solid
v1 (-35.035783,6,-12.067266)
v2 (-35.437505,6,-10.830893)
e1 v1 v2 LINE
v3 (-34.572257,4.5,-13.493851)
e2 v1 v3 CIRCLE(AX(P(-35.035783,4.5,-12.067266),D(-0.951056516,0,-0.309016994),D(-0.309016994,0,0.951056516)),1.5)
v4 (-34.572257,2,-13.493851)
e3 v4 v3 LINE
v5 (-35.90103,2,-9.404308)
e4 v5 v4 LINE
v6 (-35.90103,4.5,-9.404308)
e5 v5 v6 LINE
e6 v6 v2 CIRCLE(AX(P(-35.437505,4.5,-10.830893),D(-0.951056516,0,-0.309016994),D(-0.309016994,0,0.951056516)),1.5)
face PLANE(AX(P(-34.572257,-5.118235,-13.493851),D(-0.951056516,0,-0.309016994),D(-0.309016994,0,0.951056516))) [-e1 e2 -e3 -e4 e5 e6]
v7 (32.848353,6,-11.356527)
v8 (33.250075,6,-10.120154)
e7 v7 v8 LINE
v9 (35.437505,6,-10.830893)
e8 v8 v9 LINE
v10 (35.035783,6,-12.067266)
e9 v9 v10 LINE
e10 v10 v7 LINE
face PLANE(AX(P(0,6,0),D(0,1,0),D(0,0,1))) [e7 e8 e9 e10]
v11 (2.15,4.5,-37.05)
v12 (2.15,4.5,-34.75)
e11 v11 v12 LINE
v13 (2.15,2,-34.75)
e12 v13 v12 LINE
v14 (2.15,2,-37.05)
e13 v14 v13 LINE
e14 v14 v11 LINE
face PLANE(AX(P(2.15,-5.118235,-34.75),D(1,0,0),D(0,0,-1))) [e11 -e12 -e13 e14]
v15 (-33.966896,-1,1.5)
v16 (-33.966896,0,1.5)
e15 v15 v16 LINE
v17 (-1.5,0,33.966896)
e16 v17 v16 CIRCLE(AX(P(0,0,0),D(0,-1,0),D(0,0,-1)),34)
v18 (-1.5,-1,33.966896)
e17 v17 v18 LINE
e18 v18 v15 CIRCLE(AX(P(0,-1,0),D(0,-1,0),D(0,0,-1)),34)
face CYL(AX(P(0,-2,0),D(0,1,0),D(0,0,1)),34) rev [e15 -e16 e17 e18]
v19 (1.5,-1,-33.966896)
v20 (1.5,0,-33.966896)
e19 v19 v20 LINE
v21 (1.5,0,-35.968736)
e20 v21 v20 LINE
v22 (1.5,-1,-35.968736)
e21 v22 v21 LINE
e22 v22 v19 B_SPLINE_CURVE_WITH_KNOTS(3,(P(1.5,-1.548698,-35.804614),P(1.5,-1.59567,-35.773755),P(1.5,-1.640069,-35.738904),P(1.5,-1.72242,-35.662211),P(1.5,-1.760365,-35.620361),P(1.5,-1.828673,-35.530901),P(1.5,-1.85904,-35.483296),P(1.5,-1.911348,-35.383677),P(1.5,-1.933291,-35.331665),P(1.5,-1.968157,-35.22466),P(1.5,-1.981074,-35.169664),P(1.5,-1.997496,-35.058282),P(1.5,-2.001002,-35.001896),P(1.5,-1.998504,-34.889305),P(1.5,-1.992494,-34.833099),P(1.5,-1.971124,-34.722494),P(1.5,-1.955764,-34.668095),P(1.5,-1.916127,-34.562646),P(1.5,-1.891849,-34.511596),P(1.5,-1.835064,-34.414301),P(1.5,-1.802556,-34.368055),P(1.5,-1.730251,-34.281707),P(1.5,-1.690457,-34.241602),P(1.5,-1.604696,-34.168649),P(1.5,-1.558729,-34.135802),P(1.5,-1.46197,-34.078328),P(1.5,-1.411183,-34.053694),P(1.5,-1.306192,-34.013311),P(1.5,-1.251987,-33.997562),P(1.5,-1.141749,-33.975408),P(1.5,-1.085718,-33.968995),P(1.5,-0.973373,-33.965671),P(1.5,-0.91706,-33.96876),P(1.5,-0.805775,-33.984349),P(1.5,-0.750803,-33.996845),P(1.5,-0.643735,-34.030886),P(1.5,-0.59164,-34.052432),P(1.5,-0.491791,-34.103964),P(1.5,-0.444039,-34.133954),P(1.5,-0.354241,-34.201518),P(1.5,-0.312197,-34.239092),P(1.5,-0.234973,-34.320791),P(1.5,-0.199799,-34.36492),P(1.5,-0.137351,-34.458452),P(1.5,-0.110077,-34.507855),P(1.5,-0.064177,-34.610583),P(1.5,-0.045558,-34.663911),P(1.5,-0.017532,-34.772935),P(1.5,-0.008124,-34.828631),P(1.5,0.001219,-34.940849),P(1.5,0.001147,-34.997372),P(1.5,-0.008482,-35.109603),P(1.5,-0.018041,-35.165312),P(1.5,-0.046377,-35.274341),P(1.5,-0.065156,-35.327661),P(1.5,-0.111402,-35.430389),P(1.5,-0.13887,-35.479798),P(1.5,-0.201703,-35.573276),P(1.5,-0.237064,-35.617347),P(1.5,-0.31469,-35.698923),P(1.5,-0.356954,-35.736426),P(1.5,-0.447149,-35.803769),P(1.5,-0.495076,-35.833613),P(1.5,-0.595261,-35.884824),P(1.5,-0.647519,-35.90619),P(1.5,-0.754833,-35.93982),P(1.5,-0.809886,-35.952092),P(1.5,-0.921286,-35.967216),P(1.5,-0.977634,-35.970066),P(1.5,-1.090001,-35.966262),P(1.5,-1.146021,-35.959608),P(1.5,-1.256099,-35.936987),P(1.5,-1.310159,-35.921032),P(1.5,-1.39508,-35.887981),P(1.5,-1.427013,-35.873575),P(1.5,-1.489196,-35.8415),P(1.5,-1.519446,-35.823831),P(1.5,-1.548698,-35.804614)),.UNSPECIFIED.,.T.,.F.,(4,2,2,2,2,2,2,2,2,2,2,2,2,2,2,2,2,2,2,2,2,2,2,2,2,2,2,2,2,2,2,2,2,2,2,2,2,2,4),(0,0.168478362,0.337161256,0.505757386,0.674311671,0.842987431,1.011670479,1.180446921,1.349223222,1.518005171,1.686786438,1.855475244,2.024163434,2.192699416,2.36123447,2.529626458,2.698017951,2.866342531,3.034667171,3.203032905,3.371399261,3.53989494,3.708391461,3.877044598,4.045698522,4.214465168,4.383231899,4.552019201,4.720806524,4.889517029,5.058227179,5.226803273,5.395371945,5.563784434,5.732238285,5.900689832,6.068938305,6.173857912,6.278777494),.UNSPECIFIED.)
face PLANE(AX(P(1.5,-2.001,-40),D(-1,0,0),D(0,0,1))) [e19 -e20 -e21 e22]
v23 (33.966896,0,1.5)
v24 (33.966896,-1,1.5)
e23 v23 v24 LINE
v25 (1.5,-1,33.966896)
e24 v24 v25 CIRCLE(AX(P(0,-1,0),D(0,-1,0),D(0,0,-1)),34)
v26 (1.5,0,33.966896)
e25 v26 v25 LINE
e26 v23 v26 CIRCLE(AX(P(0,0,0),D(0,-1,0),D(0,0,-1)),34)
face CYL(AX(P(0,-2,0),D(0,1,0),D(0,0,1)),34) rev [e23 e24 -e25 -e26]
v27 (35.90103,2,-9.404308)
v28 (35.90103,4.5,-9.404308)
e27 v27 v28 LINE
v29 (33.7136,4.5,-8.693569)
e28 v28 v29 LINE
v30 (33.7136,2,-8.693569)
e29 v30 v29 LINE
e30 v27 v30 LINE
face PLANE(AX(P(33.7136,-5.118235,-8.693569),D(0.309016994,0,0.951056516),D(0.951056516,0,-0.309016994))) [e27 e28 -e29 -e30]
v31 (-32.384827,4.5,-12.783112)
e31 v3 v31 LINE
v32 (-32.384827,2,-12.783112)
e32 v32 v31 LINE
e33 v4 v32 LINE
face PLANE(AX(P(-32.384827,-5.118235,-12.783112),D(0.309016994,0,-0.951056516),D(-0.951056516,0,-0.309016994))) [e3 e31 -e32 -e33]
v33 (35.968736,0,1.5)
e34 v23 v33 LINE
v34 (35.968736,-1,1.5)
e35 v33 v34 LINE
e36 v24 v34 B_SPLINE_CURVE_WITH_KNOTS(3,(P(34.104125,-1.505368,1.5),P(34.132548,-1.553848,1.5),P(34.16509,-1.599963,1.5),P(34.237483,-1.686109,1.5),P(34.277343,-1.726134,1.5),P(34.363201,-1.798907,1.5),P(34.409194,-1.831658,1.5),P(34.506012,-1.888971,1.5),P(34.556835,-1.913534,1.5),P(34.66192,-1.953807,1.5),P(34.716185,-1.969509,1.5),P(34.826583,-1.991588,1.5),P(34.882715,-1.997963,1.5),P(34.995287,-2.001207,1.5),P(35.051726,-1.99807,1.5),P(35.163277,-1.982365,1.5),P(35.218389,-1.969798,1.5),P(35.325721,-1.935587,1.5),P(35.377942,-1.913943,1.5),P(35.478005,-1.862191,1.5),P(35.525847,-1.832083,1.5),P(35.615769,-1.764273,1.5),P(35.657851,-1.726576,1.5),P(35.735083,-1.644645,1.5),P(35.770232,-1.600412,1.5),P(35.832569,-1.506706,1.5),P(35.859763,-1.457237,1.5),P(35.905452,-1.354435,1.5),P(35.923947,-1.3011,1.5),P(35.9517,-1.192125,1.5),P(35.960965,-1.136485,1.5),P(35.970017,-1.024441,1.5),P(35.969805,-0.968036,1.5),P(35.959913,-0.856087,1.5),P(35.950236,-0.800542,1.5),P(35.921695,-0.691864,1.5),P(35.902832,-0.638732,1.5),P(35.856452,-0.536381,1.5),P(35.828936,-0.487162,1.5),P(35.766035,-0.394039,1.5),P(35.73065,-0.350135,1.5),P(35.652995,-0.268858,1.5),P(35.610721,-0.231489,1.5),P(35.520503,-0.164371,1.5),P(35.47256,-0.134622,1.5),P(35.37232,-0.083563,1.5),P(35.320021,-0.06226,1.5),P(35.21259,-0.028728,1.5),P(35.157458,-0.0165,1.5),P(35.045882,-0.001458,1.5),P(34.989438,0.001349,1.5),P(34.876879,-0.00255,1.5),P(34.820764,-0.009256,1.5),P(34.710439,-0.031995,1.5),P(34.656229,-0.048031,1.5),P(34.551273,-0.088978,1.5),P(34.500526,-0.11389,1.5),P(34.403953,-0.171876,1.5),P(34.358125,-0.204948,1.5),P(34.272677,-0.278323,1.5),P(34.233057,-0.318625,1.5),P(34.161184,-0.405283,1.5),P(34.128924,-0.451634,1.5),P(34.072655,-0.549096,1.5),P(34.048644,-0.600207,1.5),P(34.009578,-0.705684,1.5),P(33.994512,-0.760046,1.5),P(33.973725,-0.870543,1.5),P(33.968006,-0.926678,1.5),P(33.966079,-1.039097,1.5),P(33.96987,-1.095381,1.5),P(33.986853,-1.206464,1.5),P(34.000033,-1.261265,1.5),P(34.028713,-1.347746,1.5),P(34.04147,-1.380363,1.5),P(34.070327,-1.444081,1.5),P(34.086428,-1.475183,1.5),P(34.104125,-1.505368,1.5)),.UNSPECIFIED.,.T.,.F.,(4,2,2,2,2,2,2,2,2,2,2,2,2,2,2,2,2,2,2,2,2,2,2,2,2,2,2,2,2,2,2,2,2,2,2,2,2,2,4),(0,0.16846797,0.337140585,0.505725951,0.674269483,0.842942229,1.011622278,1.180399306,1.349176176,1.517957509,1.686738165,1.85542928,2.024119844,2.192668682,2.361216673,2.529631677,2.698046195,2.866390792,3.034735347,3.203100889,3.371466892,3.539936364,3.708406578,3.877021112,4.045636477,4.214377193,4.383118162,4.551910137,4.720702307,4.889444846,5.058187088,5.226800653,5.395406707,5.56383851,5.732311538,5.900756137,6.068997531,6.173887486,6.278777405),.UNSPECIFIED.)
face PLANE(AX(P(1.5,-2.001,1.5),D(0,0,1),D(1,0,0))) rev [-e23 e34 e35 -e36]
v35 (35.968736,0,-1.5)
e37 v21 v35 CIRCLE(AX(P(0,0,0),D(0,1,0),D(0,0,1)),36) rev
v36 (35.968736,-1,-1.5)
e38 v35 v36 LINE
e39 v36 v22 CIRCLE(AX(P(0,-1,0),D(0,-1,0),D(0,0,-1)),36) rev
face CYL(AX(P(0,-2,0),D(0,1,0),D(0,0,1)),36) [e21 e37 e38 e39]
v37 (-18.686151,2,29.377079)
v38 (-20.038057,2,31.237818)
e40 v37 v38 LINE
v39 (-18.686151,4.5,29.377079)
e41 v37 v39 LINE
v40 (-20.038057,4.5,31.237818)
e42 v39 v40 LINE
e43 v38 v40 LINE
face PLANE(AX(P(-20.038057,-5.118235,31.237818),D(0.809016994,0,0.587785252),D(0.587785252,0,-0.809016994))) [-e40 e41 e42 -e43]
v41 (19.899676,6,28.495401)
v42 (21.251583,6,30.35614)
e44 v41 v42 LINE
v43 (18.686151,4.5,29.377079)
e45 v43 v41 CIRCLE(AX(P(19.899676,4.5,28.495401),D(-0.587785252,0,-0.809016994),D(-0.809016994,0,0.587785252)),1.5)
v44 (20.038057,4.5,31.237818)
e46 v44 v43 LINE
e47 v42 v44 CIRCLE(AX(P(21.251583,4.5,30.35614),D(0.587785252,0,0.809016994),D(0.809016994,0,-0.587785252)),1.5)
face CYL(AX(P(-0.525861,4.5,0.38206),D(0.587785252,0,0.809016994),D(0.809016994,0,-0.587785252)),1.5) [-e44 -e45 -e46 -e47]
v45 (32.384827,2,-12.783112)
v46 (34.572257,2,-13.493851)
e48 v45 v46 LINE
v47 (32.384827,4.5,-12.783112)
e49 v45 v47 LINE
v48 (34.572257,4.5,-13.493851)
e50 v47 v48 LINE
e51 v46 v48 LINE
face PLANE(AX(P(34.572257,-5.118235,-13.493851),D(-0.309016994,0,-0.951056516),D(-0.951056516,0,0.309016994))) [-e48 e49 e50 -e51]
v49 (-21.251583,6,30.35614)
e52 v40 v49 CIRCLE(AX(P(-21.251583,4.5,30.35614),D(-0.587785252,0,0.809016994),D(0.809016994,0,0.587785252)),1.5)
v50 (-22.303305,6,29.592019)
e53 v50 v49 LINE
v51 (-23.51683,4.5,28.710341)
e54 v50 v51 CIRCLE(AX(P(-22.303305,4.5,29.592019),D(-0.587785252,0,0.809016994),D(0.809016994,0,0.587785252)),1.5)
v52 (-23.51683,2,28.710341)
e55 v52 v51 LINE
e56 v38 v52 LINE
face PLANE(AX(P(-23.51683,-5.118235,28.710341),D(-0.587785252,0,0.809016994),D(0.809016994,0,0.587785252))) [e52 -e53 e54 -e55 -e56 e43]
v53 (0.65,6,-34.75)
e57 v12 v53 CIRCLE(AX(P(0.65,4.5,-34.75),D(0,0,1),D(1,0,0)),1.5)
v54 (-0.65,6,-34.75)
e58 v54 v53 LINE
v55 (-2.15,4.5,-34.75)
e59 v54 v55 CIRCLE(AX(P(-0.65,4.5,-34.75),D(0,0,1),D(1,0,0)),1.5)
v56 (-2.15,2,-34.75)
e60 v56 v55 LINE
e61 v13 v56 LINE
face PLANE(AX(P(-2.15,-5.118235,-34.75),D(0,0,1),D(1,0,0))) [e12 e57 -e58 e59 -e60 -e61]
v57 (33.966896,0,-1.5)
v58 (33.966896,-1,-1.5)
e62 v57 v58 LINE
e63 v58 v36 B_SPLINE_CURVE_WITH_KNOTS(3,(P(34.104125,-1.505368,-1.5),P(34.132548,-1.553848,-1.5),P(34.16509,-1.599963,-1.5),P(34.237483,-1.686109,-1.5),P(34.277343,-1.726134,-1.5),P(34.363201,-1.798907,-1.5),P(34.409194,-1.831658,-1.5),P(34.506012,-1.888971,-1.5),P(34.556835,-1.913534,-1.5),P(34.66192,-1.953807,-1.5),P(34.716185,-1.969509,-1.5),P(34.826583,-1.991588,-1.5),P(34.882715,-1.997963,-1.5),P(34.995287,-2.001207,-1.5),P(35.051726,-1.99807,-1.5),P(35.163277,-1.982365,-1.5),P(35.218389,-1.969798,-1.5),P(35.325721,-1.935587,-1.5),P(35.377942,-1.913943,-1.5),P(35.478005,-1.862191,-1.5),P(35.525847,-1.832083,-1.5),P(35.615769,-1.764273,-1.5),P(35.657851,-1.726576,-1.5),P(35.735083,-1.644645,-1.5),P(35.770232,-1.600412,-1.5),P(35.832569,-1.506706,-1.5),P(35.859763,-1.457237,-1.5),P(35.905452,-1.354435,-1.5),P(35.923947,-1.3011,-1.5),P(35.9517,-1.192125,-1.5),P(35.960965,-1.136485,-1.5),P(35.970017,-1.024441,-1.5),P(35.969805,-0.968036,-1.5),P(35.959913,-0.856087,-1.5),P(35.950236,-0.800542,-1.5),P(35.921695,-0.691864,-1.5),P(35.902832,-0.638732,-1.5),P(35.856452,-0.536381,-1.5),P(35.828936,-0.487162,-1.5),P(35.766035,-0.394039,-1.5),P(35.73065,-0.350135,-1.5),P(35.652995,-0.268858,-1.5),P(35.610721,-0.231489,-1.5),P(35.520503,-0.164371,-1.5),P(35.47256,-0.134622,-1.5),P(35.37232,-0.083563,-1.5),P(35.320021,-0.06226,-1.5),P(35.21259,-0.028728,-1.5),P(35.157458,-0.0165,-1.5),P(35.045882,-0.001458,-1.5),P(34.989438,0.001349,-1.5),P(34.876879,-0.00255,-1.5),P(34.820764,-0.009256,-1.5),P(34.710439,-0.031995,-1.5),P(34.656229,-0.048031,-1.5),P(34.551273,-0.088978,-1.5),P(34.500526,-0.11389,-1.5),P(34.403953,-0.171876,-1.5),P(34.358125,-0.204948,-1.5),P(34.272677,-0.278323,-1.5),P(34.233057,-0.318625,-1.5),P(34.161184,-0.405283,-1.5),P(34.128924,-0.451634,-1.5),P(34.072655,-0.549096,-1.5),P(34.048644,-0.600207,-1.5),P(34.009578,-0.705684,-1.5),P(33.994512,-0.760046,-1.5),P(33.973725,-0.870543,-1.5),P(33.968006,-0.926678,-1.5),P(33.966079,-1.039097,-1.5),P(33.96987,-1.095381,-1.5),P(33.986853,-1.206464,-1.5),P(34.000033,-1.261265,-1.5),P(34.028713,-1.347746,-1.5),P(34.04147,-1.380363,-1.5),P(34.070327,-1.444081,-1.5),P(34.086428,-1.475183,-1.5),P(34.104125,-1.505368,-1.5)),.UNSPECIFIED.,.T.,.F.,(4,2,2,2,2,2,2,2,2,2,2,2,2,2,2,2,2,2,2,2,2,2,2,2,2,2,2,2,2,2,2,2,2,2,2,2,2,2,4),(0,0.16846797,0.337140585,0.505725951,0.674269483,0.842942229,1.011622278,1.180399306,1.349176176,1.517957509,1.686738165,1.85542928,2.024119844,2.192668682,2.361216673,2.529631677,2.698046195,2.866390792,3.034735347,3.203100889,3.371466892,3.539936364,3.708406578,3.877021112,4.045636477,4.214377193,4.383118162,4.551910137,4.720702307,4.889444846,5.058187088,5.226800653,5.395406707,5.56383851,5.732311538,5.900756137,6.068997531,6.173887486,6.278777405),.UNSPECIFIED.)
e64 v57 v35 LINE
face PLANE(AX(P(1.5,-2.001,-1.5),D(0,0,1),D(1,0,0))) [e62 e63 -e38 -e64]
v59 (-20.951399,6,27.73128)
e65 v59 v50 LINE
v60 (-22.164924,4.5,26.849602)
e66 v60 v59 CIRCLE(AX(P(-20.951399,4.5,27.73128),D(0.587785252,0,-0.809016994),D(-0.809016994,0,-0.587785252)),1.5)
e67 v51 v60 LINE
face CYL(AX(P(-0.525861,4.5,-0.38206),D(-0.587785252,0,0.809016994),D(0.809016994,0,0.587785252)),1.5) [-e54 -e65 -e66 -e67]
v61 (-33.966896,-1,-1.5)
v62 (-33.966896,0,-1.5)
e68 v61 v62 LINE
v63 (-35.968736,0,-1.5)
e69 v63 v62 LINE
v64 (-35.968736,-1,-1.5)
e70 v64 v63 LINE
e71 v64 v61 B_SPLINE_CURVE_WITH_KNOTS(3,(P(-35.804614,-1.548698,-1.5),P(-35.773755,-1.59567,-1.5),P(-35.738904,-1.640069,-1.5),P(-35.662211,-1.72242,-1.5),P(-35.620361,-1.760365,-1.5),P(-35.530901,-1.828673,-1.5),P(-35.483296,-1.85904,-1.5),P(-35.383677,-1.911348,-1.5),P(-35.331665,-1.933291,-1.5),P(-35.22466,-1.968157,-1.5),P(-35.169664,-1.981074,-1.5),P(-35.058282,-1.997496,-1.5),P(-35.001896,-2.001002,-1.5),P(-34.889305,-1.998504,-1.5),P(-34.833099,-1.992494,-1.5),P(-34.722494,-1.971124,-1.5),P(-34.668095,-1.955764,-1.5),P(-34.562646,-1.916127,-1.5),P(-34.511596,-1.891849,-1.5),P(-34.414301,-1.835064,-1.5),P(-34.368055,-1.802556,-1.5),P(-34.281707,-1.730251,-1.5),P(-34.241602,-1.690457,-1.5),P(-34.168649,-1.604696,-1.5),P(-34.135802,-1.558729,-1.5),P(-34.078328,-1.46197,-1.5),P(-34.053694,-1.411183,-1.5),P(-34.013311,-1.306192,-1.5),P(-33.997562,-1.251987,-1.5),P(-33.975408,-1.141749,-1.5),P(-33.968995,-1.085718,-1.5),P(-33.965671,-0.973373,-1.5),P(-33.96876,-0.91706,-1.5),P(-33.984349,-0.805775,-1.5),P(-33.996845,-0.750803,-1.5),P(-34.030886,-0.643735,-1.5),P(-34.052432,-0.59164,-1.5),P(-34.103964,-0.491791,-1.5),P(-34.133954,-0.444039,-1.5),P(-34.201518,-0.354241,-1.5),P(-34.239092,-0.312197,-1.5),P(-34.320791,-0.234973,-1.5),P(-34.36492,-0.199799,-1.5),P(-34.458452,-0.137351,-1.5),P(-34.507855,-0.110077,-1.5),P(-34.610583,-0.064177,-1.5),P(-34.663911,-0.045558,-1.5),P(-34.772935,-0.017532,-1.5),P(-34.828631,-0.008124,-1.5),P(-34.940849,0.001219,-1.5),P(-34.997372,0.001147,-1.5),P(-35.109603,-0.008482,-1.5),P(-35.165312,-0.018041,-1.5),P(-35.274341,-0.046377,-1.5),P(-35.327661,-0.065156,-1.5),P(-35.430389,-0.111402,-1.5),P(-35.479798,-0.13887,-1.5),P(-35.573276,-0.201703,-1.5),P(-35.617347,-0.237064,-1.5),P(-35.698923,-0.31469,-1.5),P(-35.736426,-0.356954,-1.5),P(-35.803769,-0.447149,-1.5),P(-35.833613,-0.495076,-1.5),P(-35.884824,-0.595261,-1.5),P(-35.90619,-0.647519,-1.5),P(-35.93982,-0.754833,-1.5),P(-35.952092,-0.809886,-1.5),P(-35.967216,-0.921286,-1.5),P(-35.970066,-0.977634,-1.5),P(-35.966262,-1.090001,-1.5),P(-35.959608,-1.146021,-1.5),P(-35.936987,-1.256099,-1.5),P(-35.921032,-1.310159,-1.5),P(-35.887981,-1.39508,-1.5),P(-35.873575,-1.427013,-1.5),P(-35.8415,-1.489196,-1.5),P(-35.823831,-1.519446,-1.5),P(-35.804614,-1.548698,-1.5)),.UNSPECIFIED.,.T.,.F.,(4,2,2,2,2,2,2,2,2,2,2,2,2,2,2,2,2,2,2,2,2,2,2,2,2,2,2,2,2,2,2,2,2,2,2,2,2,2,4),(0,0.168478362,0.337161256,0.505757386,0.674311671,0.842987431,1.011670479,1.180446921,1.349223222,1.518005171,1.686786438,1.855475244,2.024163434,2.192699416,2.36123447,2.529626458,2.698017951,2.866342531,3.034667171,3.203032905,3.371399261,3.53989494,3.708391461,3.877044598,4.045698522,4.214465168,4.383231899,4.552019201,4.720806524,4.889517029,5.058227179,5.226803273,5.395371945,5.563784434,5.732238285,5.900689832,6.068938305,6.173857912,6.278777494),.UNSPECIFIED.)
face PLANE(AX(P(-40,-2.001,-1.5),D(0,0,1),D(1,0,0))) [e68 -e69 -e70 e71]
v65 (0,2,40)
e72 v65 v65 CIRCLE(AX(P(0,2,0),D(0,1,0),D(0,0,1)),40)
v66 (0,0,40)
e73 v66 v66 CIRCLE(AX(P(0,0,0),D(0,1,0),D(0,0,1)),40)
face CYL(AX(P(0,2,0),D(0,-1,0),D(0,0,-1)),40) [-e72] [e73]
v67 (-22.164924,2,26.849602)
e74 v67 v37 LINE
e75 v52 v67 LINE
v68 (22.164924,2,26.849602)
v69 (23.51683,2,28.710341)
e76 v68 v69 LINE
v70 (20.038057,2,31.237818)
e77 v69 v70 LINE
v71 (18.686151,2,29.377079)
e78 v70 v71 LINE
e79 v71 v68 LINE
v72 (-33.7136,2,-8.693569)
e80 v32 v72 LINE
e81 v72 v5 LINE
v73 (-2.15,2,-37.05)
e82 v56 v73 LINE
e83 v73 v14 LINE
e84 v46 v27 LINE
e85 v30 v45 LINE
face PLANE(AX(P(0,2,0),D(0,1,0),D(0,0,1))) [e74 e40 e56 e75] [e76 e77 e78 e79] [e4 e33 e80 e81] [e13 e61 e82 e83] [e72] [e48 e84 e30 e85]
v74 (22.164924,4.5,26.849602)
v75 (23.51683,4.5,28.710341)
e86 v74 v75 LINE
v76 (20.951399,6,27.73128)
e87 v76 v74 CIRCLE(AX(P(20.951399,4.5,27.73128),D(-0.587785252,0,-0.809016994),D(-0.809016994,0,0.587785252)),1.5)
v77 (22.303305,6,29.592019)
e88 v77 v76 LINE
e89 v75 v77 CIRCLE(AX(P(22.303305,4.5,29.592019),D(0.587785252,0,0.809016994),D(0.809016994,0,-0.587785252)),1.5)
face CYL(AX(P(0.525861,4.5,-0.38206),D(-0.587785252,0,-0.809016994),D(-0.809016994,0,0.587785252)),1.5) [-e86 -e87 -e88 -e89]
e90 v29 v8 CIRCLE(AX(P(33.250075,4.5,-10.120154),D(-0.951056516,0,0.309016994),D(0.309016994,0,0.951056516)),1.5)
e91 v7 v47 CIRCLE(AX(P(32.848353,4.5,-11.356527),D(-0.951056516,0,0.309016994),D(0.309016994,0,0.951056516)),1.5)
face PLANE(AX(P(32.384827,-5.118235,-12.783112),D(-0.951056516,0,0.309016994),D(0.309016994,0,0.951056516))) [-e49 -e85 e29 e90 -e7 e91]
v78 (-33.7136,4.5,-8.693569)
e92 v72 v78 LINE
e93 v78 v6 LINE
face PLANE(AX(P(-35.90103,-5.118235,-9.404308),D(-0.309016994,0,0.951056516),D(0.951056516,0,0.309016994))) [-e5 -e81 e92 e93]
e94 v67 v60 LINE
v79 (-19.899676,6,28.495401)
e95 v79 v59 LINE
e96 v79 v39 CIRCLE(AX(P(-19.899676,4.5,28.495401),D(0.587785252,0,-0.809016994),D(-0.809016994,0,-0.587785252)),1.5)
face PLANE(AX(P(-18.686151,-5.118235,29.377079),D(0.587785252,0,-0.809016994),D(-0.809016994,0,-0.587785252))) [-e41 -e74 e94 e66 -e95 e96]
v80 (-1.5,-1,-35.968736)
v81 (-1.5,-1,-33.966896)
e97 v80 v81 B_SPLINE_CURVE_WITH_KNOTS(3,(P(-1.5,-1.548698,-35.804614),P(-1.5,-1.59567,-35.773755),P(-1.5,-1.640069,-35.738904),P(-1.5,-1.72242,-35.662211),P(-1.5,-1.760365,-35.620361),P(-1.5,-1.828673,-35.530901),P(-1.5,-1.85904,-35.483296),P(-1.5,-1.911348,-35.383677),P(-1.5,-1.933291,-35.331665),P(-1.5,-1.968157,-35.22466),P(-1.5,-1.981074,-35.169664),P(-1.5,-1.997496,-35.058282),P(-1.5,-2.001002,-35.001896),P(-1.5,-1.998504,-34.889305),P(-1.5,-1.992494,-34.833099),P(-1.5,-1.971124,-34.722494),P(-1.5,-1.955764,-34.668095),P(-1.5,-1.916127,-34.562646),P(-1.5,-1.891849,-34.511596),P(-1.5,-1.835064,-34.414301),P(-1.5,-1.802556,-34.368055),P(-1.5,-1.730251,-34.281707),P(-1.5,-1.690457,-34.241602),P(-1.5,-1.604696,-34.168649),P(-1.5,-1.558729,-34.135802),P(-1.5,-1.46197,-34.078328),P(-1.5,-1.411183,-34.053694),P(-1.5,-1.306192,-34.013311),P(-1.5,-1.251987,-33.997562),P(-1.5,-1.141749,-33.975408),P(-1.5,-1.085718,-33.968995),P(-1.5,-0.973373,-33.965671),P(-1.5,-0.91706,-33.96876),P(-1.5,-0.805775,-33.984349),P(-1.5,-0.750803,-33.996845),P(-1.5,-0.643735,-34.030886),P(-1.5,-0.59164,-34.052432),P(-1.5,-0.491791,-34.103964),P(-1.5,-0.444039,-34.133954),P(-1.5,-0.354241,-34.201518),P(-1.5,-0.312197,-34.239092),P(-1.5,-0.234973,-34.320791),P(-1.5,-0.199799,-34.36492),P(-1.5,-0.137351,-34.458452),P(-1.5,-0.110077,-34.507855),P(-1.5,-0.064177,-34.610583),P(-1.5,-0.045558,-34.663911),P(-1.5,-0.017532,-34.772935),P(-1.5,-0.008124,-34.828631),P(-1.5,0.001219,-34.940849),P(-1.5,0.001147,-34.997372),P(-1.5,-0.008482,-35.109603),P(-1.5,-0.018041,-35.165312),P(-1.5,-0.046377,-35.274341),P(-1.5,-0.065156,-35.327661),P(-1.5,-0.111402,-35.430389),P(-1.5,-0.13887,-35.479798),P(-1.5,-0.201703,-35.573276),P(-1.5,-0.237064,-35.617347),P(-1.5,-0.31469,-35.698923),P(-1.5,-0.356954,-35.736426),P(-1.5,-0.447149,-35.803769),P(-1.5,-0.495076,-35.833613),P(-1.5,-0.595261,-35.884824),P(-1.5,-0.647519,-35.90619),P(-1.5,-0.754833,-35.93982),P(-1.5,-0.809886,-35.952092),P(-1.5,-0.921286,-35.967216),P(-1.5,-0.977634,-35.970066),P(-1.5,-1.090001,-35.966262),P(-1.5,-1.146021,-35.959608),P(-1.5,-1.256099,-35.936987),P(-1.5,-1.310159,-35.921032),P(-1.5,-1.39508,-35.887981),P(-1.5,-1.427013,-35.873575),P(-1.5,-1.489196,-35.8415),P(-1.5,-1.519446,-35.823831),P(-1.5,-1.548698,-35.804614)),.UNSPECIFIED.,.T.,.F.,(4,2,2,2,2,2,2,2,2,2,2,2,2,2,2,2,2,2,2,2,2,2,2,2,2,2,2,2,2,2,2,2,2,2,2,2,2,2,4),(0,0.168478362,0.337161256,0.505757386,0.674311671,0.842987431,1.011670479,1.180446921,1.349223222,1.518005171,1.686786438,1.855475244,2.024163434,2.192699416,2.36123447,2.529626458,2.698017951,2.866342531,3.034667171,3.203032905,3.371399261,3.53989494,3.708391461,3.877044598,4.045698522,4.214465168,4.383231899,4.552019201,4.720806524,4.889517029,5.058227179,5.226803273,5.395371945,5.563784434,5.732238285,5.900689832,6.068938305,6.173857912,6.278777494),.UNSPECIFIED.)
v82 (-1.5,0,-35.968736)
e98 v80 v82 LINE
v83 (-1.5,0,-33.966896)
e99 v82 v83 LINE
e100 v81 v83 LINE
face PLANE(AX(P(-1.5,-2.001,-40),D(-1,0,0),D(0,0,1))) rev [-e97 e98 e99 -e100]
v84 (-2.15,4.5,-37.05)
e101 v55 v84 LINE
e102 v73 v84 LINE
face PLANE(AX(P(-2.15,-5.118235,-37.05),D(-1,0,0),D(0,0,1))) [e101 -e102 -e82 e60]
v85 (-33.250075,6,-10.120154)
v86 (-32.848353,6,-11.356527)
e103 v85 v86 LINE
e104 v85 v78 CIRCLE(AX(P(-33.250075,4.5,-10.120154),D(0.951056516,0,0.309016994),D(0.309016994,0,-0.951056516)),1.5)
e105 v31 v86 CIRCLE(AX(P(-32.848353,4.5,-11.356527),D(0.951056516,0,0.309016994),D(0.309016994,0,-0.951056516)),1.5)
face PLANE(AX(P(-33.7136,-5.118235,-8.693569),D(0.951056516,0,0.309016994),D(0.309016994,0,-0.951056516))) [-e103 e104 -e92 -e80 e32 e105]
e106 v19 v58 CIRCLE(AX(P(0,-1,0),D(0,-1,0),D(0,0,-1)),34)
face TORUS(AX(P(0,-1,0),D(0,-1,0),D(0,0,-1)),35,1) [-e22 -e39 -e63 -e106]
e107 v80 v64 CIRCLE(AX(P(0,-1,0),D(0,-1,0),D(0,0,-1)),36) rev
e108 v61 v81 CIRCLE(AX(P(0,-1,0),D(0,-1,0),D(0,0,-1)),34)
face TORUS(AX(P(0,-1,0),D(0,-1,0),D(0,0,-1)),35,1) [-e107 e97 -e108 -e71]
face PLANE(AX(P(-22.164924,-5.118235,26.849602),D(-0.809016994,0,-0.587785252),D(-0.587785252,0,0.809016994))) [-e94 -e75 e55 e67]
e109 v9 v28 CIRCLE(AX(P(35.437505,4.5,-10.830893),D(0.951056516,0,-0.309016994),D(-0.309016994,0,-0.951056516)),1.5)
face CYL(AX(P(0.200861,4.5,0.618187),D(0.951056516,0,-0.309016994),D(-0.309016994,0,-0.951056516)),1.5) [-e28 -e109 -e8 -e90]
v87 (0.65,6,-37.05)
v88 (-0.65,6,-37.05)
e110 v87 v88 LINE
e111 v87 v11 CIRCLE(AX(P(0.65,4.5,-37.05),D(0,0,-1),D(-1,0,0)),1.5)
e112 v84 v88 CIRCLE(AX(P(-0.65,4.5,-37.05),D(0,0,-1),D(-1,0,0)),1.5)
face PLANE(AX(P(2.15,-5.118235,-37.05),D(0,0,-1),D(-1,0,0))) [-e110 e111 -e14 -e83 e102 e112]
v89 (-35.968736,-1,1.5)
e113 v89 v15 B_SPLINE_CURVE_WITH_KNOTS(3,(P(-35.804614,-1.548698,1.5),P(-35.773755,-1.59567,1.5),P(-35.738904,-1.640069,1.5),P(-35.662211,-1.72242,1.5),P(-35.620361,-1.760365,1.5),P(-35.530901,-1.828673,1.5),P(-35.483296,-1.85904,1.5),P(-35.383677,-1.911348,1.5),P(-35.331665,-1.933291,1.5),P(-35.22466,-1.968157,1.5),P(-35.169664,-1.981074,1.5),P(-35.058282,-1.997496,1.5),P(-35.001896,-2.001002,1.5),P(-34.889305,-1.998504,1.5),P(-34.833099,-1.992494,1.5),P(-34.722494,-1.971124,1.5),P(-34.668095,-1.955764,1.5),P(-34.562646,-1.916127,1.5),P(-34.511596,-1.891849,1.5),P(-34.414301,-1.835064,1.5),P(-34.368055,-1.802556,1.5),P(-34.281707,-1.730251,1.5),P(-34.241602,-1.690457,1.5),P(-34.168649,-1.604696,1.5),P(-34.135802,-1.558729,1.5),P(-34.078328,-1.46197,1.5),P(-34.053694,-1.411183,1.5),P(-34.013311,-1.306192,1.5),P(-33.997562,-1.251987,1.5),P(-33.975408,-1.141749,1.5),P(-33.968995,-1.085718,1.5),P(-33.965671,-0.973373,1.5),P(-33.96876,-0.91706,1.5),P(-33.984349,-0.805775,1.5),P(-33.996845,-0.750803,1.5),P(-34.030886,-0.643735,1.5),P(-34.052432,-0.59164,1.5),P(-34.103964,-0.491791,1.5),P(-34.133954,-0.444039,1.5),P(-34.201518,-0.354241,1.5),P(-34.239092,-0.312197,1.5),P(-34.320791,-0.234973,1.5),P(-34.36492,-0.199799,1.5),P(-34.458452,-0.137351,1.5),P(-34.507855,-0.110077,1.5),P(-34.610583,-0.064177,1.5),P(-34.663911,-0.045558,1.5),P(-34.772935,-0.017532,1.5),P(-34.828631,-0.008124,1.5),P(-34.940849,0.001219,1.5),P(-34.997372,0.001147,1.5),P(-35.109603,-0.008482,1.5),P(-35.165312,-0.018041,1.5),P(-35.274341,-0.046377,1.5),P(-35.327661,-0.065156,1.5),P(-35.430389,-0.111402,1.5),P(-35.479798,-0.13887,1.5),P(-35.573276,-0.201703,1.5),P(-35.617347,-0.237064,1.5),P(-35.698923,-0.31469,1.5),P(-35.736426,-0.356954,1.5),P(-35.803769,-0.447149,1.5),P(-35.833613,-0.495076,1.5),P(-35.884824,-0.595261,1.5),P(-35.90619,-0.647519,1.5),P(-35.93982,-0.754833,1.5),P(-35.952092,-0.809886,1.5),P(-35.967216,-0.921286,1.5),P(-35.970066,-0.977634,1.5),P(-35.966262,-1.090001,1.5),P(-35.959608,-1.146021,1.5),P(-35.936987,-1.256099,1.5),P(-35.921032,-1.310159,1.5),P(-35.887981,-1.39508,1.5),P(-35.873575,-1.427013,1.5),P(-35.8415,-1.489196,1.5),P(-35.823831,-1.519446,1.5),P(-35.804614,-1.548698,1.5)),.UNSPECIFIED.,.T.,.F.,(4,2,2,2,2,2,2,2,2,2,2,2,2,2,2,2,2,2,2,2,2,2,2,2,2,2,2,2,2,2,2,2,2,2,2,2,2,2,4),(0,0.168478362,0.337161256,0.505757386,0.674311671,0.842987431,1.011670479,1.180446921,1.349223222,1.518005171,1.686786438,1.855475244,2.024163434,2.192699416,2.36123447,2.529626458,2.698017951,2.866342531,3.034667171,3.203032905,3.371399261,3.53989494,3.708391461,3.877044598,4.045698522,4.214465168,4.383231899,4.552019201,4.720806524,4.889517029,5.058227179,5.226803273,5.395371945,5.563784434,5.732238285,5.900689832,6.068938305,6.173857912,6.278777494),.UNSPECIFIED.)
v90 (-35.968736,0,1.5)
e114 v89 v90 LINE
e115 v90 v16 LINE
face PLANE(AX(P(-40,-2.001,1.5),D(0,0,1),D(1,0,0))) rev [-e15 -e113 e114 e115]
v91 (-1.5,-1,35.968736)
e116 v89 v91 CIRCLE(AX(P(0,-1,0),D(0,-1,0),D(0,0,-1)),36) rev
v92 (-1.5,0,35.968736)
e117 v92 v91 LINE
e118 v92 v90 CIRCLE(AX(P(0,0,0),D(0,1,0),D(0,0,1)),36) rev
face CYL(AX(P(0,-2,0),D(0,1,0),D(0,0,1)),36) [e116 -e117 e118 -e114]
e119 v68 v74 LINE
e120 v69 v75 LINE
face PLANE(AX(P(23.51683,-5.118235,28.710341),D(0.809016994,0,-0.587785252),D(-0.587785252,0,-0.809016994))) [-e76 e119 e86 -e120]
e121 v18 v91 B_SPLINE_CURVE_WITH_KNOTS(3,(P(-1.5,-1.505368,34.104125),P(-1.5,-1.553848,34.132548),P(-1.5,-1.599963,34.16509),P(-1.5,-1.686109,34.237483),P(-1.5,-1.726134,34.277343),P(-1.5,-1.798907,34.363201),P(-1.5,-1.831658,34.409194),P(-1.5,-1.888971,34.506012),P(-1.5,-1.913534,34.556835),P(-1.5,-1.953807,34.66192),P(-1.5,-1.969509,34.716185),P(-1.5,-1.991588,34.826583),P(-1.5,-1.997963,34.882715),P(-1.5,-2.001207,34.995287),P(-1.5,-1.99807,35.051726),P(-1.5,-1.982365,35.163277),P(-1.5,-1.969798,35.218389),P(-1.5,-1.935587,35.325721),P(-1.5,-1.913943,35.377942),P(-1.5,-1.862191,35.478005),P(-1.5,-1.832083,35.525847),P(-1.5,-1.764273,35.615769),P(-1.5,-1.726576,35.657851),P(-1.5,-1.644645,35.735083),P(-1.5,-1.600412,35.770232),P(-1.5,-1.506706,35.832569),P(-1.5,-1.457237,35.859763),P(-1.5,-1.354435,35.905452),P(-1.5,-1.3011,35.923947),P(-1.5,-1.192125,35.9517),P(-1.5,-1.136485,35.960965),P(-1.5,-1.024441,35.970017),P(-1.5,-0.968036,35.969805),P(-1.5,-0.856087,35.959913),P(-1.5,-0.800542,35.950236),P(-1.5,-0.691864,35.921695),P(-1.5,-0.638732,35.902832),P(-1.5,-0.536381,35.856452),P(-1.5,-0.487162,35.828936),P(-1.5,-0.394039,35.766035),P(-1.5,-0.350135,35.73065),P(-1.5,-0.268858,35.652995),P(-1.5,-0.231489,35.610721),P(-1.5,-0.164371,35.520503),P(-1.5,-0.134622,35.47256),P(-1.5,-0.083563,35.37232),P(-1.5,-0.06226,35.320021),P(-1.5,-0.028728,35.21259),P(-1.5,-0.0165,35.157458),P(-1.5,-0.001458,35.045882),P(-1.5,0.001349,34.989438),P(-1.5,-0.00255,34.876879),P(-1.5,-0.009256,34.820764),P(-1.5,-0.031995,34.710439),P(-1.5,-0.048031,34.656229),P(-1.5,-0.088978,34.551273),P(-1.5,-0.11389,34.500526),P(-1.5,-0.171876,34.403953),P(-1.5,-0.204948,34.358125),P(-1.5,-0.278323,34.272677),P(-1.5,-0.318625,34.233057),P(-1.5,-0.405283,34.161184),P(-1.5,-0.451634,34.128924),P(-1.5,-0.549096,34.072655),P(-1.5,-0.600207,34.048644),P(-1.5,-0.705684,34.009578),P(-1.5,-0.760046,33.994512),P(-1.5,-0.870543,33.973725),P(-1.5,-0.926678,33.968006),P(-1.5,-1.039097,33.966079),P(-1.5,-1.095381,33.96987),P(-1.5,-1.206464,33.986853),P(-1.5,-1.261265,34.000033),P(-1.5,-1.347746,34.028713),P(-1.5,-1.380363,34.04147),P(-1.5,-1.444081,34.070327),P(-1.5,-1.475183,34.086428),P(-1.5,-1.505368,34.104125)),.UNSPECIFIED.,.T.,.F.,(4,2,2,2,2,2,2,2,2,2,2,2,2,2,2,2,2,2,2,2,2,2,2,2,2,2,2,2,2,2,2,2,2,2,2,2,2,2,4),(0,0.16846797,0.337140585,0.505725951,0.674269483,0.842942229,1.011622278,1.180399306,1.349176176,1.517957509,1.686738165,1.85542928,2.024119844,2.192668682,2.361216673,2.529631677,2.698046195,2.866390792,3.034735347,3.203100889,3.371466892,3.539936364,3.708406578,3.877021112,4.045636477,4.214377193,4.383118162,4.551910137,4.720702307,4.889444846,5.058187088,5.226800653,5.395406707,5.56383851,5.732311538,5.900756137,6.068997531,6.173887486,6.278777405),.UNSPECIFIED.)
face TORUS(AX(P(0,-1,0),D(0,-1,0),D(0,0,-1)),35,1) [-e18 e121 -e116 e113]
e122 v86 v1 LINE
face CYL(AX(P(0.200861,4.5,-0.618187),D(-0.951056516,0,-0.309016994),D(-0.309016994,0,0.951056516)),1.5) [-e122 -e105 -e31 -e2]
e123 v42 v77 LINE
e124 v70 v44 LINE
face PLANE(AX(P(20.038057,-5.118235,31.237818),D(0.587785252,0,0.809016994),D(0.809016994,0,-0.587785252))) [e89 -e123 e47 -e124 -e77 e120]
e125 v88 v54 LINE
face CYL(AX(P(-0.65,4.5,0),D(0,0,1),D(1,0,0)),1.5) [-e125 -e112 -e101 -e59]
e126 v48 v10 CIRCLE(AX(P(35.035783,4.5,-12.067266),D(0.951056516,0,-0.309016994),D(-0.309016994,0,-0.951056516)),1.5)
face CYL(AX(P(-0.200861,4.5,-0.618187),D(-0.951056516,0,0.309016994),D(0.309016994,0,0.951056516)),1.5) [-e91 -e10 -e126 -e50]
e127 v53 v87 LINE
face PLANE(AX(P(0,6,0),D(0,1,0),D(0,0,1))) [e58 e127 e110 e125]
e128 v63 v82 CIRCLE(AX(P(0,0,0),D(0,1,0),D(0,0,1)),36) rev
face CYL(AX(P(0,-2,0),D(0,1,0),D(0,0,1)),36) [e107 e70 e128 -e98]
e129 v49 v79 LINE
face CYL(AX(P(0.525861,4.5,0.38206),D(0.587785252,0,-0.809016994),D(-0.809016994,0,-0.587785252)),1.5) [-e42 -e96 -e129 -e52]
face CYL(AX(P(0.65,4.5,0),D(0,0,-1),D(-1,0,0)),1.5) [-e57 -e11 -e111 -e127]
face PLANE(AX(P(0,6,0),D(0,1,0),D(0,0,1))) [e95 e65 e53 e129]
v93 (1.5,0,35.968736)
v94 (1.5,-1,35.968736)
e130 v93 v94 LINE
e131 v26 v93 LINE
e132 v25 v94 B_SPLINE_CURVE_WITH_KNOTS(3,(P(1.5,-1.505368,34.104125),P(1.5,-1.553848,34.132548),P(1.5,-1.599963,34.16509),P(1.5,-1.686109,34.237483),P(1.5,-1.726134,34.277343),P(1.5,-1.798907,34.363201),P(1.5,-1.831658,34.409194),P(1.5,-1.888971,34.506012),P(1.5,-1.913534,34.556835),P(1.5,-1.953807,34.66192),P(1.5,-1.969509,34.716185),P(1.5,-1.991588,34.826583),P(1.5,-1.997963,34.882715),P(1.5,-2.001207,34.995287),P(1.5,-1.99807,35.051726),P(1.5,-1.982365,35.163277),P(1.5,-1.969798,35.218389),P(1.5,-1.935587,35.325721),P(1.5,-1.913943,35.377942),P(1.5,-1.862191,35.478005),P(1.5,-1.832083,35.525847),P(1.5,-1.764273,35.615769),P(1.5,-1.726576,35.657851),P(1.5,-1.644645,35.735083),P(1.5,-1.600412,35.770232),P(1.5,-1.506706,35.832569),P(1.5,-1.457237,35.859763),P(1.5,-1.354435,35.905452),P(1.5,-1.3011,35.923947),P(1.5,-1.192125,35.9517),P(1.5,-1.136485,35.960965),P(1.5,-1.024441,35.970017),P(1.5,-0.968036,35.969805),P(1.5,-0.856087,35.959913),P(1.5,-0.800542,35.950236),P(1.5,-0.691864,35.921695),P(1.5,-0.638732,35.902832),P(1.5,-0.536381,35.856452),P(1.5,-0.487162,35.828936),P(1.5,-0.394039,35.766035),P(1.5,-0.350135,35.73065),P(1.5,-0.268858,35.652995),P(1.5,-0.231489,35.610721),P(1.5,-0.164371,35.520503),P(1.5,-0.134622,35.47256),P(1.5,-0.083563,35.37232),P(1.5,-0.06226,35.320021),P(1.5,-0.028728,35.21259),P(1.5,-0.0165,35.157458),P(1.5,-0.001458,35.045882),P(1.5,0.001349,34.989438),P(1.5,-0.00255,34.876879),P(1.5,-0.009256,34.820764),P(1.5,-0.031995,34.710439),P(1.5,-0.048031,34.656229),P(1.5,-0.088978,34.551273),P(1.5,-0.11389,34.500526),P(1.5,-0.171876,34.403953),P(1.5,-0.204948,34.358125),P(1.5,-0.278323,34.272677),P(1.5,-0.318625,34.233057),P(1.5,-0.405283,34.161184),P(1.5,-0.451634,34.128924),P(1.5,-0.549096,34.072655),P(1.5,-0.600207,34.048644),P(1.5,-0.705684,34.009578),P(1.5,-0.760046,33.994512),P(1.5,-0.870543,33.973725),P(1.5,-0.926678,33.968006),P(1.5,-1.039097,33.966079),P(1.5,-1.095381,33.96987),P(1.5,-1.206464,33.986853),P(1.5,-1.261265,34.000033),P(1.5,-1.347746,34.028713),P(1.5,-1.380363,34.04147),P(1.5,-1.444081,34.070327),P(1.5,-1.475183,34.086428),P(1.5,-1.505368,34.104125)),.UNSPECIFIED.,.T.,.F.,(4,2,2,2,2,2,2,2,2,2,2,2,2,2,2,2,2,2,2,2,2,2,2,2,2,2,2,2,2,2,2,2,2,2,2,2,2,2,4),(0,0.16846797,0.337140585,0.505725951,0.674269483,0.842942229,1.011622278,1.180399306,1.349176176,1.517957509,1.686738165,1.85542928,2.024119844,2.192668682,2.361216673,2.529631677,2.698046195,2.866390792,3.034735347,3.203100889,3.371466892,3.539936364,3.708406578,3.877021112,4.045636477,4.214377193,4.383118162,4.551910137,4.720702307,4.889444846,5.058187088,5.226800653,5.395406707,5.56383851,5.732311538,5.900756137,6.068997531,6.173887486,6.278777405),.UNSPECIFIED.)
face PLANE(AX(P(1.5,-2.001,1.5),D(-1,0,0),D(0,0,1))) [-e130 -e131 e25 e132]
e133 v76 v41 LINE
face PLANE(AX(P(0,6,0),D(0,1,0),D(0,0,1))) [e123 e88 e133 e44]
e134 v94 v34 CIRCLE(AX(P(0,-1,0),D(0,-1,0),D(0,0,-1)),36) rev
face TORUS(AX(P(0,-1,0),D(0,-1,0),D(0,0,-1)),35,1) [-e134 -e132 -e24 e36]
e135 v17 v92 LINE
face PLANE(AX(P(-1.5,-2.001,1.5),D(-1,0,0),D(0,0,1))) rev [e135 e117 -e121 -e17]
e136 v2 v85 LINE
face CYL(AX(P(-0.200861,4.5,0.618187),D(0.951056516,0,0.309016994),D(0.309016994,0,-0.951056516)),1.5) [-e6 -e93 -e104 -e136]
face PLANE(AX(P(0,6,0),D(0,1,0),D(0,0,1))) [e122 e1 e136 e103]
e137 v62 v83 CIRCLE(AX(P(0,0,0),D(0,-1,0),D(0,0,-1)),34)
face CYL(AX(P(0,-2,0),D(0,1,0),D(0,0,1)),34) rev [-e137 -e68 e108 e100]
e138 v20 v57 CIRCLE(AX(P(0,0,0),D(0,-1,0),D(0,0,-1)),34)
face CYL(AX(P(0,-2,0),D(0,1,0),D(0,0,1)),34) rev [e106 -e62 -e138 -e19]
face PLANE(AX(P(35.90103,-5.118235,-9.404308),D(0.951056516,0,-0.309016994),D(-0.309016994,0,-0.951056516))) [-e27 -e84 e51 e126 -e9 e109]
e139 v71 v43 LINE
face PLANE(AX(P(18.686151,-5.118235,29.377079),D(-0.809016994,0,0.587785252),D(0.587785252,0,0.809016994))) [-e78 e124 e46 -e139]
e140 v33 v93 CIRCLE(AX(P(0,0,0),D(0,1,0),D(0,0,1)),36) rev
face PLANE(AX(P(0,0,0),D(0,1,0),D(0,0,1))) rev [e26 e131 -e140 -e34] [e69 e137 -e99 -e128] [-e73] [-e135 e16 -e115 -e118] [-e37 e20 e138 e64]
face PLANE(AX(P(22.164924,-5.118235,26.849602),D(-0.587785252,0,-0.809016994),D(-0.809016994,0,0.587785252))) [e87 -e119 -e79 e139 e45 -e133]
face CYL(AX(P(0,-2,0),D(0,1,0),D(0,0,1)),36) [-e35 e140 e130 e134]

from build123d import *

# Parameters (mm, degrees)
SKETCH1_R           = 40
BOSS_EXTRUDE1_DEPTH = 2
SKETCH2_W           = 4.6
SKETCH2_H           = 2.6
BOSS_EXTRUDE2_DEPTH = 4
SKETCH3_R           = 36
SKETCH3_R_2         = 34
BOSS_EXTRUDE3_DEPTH = 2
FILLET2_R           = 1
CUT_EXTRUDE1_DEPTH  = 2
SKETCH5_W           = 4.6
SKETCH5_H           = 2.6
SKETCH5_W_2         = 4.3
SKETCH5_H_2         = 2.3
CUT_EXTRUDE2_DEPTH  = 4
FILLET3_R           = 1.5


with BuildPart() as part:
    # Sketch1 → Boss-Extrude1 (new body)
    with BuildSketch(Plane(origin=(0, 0, 0), x_dir=(1, 0, 0), z_dir=(0, 1, 0))):
        with Locations(Location((0, 0, 0), (0, 0, 270))):
            Circle(SKETCH1_R)
    extrude(amount=BOSS_EXTRUDE1_DEPTH)

    # Sketch2 → Boss-Extrude2 (add)
    with BuildSketch(Plane(origin=(0, 2, 0), x_dir=(1, 0, 0), z_dir=(0, 1, 0))):
        with Locations((0, 35.9)):
            Rectangle(SKETCH2_W, SKETCH2_H)
        Polygon((34.668563319, 13.682862178), (36.090041493, 9.308002203), (33.617294551, 8.504558018), (32.195816377, 12.879417993), align=None)
        Polygon((23.726350472, -28.74352611), (20.004872298, -31.447338271), (18.476630642, -29.343894086), (22.198108816, -26.640081925), align=None)
        Polygon((-20.004872298, -31.447338271), (-23.726350472, -28.74352611), (-22.198108816, -26.640081925), (-18.476630642, -29.343894086), align=None)
        Polygon((-36.090041493, 9.308002203), (-34.668563319, 13.682862178), (-32.195816377, 12.879417993), (-33.617294551, 8.504558018), align=None)
    extrude(amount=BOSS_EXTRUDE2_DEPTH)

    # Sketch3 → Boss-Extrude3 (add)
    with BuildSketch(Plane.XZ):
        with Locations(Location((0, 0, 0), (0, 0, 90))):
            Circle(SKETCH3_R)
        with Locations(Location((0, 0, 0), (0, 0, 270))):
            Circle(SKETCH3_R_2, mode=Mode.SUBTRACT)
    extrude(amount=BOSS_EXTRUDE3_DEPTH)

    # Fillet2
    fillet2_edges = [part.edges().sort_by_distance(p)[0] for p in [
        (0, -2, -36),
        (0, -2, 34),
    ]]
    fillet(fillet2_edges, radius=FILLET2_R - 0.0001)  # a hair under: the kernel refuses the full size

    # Sketch4 → Cut-Extrude1 (cut)
    with BuildSketch(Plane.XZ):
        Polygon((-1.5, -40), (-1.5, -1.5), (-40, -1.5), (-40, 1.5), (-1.5, 1.5), (-1.5, 40), (1.5, 40), (1.5, 1.5), (40, 1.5), (40, -1.5), (1.5, -1.5), (1.5, -40), align=None)
    extrude(amount=CUT_EXTRUDE1_DEPTH, mode=Mode.SUBTRACT)

    # Sketch5 → Cut-Extrude2 (cut)
    # profile 1 of 5: a face of its own
    with BuildSketch(Plane(origin=(0, 6, 0), x_dir=(1, 0, 0), z_dir=(0, 1, 0))):
        Polygon((34.668563319, 13.682862178), (32.195816377, 12.879417993), (33.617294551, 8.504558018), (36.090041493, 9.308002203), align=None)
        Polygon((34.572257391, 13.493851152), (32.384827403, 12.783112065), (33.713600479, 8.693569044), (35.901030467, 9.404308132), align=None, mode=Mode.SUBTRACT)
    # profile 2 of 5: a face of its own
    with BuildSketch(Plane(origin=(0, 6, 0), x_dir=(1, 0, 0), z_dir=(0, 1, 0))):
        with Locations((0, 35.9)):
            Rectangle(SKETCH5_W, SKETCH5_H)
        with Locations((0, 35.9)):
            Rectangle(SKETCH5_W_2, SKETCH5_H_2, mode=Mode.SUBTRACT)
    # profile 3 of 5: a face of its own
    with BuildSketch(Plane(origin=(0, 6, 0), x_dir=(1, 0, 0), z_dir=(0, 1, 0))):
        Polygon((23.726350472, -28.74352611), (22.198108816, -26.640081925), (18.476630642, -29.343894086), (20.004872298, -31.447338271), align=None)
        Polygon((23.516830135, -28.710341349), (22.164924055, -26.849602262), (18.686150979, -29.377078847), (20.03805706, -31.237817934), align=None, mode=Mode.SUBTRACT)
    # profile 4 of 5: a face of its own
    with BuildSketch(Plane(origin=(0, 6, 0), x_dir=(1, 0, 0), z_dir=(0, 1, 0))):
        Polygon((-20.004872298, -31.447338271), (-18.476630642, -29.343894086), (-22.198108816, -26.640081925), (-23.726350472, -28.74352611), align=None)
        Polygon((-20.03805706, -31.237817934), (-18.686150979, -29.377078847), (-22.164924055, -26.849602262), (-23.516830135, -28.710341349), align=None, mode=Mode.SUBTRACT)
    # profile 5 of 5: a face of its own
    with BuildSketch(Plane(origin=(0, 6, 0), x_dir=(1, 0, 0), z_dir=(0, 1, 0))):
        Polygon((-36.090041493, 9.308002203), (-33.617294551, 8.504558018), (-32.195816377, 12.879417993), (-34.668563319, 13.682862178), align=None)
        Polygon((-35.901030467, 9.404308132), (-33.713600479, 8.693569044), (-32.384827403, 12.783112065), (-34.572257391, 13.493851152), align=None, mode=Mode.SUBTRACT)
    extrude(amount=-CUT_EXTRUDE2_DEPTH, mode=Mode.SUBTRACT)

    # Fillet3
    fillet3_edges = [part.edges().sort_by_distance(p)[0] for p in [
        (-2.15, 6, -35.9),
        (2.15, 6, -35.9),
        (33.478542397, 6, -13.138481608),
        (34.807315473, 6, -9.048938588),
        (22.840877095, 6, 27.779971806),
        (19.362104019, 6, 30.30744839),
        (-19.362104019, 6, 30.30744839),
        (-22.840877095, 6, 27.779971806),
        (-34.807315473, 6, -9.048938588),
        (-33.478542397, 6, -13.138481608),
    ]]
    fillet(fillet3_edges, radius=FILLET3_R)


solid = part.part
